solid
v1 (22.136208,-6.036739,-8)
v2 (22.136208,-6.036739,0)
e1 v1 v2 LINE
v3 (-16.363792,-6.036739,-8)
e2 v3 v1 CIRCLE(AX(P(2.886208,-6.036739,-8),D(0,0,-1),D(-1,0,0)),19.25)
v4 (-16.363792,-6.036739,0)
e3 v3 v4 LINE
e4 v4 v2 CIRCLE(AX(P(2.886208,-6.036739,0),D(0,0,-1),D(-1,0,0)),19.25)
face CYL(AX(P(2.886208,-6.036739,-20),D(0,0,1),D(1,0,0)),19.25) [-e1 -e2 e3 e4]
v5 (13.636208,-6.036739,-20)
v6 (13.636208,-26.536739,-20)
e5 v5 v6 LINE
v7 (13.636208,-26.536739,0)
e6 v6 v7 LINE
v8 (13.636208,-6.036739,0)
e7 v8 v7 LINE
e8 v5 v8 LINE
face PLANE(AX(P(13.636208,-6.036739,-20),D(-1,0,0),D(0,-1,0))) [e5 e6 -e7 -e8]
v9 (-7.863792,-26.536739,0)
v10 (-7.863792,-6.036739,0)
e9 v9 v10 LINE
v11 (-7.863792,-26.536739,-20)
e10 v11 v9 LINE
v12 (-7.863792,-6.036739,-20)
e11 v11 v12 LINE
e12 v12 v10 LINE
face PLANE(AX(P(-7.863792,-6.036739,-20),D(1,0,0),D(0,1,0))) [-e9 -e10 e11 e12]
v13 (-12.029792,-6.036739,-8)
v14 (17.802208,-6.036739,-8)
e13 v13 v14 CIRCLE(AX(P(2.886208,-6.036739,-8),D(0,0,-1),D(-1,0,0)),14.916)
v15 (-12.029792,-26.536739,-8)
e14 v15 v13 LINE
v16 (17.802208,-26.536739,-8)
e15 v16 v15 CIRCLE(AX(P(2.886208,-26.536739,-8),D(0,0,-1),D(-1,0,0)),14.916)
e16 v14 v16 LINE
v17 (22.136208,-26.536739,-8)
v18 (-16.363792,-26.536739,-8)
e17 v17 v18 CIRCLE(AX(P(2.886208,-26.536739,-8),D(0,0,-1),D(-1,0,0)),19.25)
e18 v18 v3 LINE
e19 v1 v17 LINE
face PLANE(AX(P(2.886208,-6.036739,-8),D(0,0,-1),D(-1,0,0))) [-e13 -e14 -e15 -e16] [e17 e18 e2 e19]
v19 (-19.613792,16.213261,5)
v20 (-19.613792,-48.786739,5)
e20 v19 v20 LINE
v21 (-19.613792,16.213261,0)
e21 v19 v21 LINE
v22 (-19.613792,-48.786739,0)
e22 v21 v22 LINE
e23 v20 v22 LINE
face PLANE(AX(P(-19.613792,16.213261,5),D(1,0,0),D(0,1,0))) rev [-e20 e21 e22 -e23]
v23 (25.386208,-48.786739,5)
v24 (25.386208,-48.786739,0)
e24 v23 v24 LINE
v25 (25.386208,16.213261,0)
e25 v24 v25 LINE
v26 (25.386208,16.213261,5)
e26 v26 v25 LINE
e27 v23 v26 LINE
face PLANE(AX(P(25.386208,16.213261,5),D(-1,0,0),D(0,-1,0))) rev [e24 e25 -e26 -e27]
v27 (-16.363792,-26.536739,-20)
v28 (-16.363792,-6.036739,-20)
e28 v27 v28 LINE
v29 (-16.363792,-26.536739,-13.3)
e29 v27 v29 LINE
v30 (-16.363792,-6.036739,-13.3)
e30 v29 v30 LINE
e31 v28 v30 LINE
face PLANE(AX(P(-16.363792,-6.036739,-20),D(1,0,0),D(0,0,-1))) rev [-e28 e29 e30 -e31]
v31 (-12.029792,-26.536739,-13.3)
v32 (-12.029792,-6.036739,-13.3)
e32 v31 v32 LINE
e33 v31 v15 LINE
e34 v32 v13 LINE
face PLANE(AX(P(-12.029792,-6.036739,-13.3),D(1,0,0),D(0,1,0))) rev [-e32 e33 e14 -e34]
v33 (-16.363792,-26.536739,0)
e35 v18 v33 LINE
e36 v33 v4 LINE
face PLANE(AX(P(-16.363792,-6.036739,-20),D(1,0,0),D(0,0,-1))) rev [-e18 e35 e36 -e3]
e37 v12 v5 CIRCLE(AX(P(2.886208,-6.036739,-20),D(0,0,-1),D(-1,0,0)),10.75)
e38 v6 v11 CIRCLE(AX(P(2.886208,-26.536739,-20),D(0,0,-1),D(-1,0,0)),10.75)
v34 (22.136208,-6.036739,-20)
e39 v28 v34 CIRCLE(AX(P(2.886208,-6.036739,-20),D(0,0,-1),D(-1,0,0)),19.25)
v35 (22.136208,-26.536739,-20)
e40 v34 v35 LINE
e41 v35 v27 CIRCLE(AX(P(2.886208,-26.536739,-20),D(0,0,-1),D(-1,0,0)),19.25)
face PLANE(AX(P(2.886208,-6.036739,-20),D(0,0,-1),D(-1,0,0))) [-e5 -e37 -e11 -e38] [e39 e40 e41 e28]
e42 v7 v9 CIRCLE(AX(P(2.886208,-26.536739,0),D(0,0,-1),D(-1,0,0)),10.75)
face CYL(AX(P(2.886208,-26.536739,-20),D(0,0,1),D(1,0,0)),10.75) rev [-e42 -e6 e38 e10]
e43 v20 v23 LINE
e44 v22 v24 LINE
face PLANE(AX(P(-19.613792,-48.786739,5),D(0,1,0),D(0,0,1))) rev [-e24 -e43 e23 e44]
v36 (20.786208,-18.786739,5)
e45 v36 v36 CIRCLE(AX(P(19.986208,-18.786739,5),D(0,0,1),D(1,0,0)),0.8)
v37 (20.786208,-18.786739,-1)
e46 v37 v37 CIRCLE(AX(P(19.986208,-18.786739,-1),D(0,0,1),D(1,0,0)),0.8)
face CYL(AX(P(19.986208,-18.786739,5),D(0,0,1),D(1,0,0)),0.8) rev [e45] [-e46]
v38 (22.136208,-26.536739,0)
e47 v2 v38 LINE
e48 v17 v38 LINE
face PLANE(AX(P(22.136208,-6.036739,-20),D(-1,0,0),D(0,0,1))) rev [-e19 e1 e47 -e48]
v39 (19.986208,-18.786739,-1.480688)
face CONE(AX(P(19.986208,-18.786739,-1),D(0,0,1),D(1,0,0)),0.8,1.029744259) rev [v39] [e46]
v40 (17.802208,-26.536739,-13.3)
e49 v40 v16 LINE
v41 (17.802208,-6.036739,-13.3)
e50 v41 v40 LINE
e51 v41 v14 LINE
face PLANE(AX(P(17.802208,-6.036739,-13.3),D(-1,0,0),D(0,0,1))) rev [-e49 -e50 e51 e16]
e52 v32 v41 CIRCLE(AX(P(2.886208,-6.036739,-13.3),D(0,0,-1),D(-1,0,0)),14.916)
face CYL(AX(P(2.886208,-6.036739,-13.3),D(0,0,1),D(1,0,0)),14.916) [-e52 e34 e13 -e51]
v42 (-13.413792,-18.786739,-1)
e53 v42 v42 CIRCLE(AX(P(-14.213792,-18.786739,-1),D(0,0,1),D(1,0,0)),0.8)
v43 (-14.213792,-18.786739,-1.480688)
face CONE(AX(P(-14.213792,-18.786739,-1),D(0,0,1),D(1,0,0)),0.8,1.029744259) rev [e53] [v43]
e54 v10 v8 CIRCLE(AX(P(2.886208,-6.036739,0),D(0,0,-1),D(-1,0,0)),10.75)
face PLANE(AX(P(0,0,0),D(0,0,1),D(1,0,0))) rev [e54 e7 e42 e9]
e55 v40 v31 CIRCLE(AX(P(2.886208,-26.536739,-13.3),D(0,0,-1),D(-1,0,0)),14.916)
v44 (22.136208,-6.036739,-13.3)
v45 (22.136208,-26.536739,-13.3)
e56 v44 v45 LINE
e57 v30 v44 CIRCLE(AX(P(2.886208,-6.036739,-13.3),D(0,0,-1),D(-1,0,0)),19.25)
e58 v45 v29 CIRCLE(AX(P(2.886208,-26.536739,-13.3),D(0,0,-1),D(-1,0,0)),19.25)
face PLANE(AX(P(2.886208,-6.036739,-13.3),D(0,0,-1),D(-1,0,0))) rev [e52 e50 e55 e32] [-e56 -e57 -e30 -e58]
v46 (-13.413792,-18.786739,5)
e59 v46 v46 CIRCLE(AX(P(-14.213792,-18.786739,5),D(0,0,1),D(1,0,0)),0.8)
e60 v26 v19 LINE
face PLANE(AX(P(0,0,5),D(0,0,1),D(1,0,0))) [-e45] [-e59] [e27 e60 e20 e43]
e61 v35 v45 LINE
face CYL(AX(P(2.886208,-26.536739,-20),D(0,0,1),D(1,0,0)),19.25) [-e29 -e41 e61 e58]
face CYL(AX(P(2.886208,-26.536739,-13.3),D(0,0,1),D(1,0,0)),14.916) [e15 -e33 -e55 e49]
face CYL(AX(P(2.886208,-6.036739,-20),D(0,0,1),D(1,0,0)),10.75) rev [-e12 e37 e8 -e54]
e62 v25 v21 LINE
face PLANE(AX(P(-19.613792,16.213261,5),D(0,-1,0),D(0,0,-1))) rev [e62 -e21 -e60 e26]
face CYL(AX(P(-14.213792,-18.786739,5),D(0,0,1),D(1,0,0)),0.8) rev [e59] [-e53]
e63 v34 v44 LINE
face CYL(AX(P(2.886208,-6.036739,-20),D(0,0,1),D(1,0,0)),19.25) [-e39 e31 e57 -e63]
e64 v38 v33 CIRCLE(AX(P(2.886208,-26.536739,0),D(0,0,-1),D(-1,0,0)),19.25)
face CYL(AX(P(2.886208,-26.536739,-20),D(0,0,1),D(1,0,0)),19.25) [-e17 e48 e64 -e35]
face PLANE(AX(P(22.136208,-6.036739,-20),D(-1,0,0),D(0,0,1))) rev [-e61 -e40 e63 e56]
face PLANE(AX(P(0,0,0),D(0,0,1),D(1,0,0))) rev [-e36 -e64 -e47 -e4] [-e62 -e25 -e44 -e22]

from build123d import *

# Parameters (mm, degrees)
SKETCH1_W                 = 45
SKETCH1_H                 = 65
BOSS_EXTRUDE1_DEPTH       = 5
BOSS_EXTRUDE2_DEPTH       = 20
BOSS_EXTRUDE3_DEPTH       = 5.3
M2X0_4_TAPPED_HOLE1_D     = 1.6
M2X0_4_TAPPED_HOLE1_DEPTH = 6
M2X0_4_TAPPED_HOLE1_TIP   = 0.480688495


with BuildPart() as part:
    # Sketch1 → Boss-Extrude1 (new body)
    with BuildSketch(Plane.XY):
        with Locations((2.886207951, -16.286739239)):
            Rectangle(SKETCH1_W, SKETCH1_H)
    extrude(amount=BOSS_EXTRUDE1_DEPTH)

    # Sketch4 → Boss-Extrude2 (add)
    with BuildSketch(Plane(origin=(0, 0, 0), x_dir=(-1, 0, 0), z_dir=(0, 0, -1))):
        with BuildLine():
            Line((16.363792049, -6.036739239), (16.363792049, -26.536739239))
            ThreePointArc((16.363792049, -26.536739239), (-2.886207951, -45.786739239), (-22.136207951, -26.536739239))
            Line((-22.136207951, -26.536739239), (-22.136207951, -6.036739239))
            ThreePointArc((-22.136207951, -6.036739239), (-2.886207951, 13.213260761), (16.363792049, -6.036739239))
        make_face()
        with BuildLine():
            Line((7.863792049, -6.036739239), (7.863792049, -26.536739239))
            ThreePointArc((7.863792049, -26.536739239), (-2.886207951, -37.286739239), (-13.636207951, -26.536739239))
            Line((-13.636207951, -26.536739239), (-13.636207951, -6.036739239))
            ThreePointArc((-13.636207951, -6.036739239), (-2.886207951, 4.713260761), (7.863792049, -6.036739239))
        make_face(mode=Mode.SUBTRACT)
    extrude(amount=BOSS_EXTRUDE2_DEPTH)


with BuildPart() as body_2:
    # Sketch6 → Boss-Extrude3 (new body)
    with BuildSketch(Plane(origin=(0, 0, 0), x_dir=(-1, 0, 0), z_dir=(0, 0, -1))):
        with BuildLine():
            Line((16.363792049, -6.036739239), (16.363792049, -26.536739239))
            ThreePointArc((16.363792049, -26.536739239), (-2.886207951, -45.786739239), (-22.136207951, -26.536739239))
            Line((-22.136207951, -26.536739239), (-22.136207951, -6.036739239))
            ThreePointArc((-22.136207951, -6.036739239), (-2.886207951, 13.213260761), (16.363792049, -6.036739239))
        make_face()
        with BuildLine():
            Line((12.029792049, -6.036739239), (12.029792049, -26.536739239))
            ThreePointArc((12.029792049, -26.536739239), (-2.886207951, -41.452739239), (-17.802207951, -26.536739239))
            Line((-17.802207951, -26.536739239), (-17.802207951, -6.036739239))
            ThreePointArc((-17.802207951, -6.036739239), (-2.886207951, 8.879260761), (12.029792049, -6.036739239))
        make_face(mode=Mode.SUBTRACT)
    extrude(amount=BOSS_EXTRUDE3_DEPTH)


with BuildPart() as body_2_1:
    # Body-Move/Copy1: read off the stored shape, not the designer's step
    # Body-Move/Copy1: moved
    add(body_2.part.moved(Location((0, 0, -8))))


with BuildPart() as part_1:
    add(part.part)

    # Combine1: cut body 2
    add(body_2_1.part, mode=Mode.SUBTRACT)

    # M2x0.4 Tapped Hole1
    with Locations(Plane.XY.offset(5)):
        with Locations((-14.213792049, -18.786739239), (19.986207951, -18.786739239)):
            Hole(M2X0_4_TAPPED_HOLE1_D / 2, depth=M2X0_4_TAPPED_HOLE1_DEPTH)
            with Locations((0, 0, -(M2X0_4_TAPPED_HOLE1_DEPTH + M2X0_4_TAPPED_HOLE1_TIP / 2))):  # 118° drill point
                Cone(0, M2X0_4_TAPPED_HOLE1_D / 2, M2X0_4_TAPPED_HOLE1_TIP, mode=Mode.SUBTRACT)


solid = part_1.part
